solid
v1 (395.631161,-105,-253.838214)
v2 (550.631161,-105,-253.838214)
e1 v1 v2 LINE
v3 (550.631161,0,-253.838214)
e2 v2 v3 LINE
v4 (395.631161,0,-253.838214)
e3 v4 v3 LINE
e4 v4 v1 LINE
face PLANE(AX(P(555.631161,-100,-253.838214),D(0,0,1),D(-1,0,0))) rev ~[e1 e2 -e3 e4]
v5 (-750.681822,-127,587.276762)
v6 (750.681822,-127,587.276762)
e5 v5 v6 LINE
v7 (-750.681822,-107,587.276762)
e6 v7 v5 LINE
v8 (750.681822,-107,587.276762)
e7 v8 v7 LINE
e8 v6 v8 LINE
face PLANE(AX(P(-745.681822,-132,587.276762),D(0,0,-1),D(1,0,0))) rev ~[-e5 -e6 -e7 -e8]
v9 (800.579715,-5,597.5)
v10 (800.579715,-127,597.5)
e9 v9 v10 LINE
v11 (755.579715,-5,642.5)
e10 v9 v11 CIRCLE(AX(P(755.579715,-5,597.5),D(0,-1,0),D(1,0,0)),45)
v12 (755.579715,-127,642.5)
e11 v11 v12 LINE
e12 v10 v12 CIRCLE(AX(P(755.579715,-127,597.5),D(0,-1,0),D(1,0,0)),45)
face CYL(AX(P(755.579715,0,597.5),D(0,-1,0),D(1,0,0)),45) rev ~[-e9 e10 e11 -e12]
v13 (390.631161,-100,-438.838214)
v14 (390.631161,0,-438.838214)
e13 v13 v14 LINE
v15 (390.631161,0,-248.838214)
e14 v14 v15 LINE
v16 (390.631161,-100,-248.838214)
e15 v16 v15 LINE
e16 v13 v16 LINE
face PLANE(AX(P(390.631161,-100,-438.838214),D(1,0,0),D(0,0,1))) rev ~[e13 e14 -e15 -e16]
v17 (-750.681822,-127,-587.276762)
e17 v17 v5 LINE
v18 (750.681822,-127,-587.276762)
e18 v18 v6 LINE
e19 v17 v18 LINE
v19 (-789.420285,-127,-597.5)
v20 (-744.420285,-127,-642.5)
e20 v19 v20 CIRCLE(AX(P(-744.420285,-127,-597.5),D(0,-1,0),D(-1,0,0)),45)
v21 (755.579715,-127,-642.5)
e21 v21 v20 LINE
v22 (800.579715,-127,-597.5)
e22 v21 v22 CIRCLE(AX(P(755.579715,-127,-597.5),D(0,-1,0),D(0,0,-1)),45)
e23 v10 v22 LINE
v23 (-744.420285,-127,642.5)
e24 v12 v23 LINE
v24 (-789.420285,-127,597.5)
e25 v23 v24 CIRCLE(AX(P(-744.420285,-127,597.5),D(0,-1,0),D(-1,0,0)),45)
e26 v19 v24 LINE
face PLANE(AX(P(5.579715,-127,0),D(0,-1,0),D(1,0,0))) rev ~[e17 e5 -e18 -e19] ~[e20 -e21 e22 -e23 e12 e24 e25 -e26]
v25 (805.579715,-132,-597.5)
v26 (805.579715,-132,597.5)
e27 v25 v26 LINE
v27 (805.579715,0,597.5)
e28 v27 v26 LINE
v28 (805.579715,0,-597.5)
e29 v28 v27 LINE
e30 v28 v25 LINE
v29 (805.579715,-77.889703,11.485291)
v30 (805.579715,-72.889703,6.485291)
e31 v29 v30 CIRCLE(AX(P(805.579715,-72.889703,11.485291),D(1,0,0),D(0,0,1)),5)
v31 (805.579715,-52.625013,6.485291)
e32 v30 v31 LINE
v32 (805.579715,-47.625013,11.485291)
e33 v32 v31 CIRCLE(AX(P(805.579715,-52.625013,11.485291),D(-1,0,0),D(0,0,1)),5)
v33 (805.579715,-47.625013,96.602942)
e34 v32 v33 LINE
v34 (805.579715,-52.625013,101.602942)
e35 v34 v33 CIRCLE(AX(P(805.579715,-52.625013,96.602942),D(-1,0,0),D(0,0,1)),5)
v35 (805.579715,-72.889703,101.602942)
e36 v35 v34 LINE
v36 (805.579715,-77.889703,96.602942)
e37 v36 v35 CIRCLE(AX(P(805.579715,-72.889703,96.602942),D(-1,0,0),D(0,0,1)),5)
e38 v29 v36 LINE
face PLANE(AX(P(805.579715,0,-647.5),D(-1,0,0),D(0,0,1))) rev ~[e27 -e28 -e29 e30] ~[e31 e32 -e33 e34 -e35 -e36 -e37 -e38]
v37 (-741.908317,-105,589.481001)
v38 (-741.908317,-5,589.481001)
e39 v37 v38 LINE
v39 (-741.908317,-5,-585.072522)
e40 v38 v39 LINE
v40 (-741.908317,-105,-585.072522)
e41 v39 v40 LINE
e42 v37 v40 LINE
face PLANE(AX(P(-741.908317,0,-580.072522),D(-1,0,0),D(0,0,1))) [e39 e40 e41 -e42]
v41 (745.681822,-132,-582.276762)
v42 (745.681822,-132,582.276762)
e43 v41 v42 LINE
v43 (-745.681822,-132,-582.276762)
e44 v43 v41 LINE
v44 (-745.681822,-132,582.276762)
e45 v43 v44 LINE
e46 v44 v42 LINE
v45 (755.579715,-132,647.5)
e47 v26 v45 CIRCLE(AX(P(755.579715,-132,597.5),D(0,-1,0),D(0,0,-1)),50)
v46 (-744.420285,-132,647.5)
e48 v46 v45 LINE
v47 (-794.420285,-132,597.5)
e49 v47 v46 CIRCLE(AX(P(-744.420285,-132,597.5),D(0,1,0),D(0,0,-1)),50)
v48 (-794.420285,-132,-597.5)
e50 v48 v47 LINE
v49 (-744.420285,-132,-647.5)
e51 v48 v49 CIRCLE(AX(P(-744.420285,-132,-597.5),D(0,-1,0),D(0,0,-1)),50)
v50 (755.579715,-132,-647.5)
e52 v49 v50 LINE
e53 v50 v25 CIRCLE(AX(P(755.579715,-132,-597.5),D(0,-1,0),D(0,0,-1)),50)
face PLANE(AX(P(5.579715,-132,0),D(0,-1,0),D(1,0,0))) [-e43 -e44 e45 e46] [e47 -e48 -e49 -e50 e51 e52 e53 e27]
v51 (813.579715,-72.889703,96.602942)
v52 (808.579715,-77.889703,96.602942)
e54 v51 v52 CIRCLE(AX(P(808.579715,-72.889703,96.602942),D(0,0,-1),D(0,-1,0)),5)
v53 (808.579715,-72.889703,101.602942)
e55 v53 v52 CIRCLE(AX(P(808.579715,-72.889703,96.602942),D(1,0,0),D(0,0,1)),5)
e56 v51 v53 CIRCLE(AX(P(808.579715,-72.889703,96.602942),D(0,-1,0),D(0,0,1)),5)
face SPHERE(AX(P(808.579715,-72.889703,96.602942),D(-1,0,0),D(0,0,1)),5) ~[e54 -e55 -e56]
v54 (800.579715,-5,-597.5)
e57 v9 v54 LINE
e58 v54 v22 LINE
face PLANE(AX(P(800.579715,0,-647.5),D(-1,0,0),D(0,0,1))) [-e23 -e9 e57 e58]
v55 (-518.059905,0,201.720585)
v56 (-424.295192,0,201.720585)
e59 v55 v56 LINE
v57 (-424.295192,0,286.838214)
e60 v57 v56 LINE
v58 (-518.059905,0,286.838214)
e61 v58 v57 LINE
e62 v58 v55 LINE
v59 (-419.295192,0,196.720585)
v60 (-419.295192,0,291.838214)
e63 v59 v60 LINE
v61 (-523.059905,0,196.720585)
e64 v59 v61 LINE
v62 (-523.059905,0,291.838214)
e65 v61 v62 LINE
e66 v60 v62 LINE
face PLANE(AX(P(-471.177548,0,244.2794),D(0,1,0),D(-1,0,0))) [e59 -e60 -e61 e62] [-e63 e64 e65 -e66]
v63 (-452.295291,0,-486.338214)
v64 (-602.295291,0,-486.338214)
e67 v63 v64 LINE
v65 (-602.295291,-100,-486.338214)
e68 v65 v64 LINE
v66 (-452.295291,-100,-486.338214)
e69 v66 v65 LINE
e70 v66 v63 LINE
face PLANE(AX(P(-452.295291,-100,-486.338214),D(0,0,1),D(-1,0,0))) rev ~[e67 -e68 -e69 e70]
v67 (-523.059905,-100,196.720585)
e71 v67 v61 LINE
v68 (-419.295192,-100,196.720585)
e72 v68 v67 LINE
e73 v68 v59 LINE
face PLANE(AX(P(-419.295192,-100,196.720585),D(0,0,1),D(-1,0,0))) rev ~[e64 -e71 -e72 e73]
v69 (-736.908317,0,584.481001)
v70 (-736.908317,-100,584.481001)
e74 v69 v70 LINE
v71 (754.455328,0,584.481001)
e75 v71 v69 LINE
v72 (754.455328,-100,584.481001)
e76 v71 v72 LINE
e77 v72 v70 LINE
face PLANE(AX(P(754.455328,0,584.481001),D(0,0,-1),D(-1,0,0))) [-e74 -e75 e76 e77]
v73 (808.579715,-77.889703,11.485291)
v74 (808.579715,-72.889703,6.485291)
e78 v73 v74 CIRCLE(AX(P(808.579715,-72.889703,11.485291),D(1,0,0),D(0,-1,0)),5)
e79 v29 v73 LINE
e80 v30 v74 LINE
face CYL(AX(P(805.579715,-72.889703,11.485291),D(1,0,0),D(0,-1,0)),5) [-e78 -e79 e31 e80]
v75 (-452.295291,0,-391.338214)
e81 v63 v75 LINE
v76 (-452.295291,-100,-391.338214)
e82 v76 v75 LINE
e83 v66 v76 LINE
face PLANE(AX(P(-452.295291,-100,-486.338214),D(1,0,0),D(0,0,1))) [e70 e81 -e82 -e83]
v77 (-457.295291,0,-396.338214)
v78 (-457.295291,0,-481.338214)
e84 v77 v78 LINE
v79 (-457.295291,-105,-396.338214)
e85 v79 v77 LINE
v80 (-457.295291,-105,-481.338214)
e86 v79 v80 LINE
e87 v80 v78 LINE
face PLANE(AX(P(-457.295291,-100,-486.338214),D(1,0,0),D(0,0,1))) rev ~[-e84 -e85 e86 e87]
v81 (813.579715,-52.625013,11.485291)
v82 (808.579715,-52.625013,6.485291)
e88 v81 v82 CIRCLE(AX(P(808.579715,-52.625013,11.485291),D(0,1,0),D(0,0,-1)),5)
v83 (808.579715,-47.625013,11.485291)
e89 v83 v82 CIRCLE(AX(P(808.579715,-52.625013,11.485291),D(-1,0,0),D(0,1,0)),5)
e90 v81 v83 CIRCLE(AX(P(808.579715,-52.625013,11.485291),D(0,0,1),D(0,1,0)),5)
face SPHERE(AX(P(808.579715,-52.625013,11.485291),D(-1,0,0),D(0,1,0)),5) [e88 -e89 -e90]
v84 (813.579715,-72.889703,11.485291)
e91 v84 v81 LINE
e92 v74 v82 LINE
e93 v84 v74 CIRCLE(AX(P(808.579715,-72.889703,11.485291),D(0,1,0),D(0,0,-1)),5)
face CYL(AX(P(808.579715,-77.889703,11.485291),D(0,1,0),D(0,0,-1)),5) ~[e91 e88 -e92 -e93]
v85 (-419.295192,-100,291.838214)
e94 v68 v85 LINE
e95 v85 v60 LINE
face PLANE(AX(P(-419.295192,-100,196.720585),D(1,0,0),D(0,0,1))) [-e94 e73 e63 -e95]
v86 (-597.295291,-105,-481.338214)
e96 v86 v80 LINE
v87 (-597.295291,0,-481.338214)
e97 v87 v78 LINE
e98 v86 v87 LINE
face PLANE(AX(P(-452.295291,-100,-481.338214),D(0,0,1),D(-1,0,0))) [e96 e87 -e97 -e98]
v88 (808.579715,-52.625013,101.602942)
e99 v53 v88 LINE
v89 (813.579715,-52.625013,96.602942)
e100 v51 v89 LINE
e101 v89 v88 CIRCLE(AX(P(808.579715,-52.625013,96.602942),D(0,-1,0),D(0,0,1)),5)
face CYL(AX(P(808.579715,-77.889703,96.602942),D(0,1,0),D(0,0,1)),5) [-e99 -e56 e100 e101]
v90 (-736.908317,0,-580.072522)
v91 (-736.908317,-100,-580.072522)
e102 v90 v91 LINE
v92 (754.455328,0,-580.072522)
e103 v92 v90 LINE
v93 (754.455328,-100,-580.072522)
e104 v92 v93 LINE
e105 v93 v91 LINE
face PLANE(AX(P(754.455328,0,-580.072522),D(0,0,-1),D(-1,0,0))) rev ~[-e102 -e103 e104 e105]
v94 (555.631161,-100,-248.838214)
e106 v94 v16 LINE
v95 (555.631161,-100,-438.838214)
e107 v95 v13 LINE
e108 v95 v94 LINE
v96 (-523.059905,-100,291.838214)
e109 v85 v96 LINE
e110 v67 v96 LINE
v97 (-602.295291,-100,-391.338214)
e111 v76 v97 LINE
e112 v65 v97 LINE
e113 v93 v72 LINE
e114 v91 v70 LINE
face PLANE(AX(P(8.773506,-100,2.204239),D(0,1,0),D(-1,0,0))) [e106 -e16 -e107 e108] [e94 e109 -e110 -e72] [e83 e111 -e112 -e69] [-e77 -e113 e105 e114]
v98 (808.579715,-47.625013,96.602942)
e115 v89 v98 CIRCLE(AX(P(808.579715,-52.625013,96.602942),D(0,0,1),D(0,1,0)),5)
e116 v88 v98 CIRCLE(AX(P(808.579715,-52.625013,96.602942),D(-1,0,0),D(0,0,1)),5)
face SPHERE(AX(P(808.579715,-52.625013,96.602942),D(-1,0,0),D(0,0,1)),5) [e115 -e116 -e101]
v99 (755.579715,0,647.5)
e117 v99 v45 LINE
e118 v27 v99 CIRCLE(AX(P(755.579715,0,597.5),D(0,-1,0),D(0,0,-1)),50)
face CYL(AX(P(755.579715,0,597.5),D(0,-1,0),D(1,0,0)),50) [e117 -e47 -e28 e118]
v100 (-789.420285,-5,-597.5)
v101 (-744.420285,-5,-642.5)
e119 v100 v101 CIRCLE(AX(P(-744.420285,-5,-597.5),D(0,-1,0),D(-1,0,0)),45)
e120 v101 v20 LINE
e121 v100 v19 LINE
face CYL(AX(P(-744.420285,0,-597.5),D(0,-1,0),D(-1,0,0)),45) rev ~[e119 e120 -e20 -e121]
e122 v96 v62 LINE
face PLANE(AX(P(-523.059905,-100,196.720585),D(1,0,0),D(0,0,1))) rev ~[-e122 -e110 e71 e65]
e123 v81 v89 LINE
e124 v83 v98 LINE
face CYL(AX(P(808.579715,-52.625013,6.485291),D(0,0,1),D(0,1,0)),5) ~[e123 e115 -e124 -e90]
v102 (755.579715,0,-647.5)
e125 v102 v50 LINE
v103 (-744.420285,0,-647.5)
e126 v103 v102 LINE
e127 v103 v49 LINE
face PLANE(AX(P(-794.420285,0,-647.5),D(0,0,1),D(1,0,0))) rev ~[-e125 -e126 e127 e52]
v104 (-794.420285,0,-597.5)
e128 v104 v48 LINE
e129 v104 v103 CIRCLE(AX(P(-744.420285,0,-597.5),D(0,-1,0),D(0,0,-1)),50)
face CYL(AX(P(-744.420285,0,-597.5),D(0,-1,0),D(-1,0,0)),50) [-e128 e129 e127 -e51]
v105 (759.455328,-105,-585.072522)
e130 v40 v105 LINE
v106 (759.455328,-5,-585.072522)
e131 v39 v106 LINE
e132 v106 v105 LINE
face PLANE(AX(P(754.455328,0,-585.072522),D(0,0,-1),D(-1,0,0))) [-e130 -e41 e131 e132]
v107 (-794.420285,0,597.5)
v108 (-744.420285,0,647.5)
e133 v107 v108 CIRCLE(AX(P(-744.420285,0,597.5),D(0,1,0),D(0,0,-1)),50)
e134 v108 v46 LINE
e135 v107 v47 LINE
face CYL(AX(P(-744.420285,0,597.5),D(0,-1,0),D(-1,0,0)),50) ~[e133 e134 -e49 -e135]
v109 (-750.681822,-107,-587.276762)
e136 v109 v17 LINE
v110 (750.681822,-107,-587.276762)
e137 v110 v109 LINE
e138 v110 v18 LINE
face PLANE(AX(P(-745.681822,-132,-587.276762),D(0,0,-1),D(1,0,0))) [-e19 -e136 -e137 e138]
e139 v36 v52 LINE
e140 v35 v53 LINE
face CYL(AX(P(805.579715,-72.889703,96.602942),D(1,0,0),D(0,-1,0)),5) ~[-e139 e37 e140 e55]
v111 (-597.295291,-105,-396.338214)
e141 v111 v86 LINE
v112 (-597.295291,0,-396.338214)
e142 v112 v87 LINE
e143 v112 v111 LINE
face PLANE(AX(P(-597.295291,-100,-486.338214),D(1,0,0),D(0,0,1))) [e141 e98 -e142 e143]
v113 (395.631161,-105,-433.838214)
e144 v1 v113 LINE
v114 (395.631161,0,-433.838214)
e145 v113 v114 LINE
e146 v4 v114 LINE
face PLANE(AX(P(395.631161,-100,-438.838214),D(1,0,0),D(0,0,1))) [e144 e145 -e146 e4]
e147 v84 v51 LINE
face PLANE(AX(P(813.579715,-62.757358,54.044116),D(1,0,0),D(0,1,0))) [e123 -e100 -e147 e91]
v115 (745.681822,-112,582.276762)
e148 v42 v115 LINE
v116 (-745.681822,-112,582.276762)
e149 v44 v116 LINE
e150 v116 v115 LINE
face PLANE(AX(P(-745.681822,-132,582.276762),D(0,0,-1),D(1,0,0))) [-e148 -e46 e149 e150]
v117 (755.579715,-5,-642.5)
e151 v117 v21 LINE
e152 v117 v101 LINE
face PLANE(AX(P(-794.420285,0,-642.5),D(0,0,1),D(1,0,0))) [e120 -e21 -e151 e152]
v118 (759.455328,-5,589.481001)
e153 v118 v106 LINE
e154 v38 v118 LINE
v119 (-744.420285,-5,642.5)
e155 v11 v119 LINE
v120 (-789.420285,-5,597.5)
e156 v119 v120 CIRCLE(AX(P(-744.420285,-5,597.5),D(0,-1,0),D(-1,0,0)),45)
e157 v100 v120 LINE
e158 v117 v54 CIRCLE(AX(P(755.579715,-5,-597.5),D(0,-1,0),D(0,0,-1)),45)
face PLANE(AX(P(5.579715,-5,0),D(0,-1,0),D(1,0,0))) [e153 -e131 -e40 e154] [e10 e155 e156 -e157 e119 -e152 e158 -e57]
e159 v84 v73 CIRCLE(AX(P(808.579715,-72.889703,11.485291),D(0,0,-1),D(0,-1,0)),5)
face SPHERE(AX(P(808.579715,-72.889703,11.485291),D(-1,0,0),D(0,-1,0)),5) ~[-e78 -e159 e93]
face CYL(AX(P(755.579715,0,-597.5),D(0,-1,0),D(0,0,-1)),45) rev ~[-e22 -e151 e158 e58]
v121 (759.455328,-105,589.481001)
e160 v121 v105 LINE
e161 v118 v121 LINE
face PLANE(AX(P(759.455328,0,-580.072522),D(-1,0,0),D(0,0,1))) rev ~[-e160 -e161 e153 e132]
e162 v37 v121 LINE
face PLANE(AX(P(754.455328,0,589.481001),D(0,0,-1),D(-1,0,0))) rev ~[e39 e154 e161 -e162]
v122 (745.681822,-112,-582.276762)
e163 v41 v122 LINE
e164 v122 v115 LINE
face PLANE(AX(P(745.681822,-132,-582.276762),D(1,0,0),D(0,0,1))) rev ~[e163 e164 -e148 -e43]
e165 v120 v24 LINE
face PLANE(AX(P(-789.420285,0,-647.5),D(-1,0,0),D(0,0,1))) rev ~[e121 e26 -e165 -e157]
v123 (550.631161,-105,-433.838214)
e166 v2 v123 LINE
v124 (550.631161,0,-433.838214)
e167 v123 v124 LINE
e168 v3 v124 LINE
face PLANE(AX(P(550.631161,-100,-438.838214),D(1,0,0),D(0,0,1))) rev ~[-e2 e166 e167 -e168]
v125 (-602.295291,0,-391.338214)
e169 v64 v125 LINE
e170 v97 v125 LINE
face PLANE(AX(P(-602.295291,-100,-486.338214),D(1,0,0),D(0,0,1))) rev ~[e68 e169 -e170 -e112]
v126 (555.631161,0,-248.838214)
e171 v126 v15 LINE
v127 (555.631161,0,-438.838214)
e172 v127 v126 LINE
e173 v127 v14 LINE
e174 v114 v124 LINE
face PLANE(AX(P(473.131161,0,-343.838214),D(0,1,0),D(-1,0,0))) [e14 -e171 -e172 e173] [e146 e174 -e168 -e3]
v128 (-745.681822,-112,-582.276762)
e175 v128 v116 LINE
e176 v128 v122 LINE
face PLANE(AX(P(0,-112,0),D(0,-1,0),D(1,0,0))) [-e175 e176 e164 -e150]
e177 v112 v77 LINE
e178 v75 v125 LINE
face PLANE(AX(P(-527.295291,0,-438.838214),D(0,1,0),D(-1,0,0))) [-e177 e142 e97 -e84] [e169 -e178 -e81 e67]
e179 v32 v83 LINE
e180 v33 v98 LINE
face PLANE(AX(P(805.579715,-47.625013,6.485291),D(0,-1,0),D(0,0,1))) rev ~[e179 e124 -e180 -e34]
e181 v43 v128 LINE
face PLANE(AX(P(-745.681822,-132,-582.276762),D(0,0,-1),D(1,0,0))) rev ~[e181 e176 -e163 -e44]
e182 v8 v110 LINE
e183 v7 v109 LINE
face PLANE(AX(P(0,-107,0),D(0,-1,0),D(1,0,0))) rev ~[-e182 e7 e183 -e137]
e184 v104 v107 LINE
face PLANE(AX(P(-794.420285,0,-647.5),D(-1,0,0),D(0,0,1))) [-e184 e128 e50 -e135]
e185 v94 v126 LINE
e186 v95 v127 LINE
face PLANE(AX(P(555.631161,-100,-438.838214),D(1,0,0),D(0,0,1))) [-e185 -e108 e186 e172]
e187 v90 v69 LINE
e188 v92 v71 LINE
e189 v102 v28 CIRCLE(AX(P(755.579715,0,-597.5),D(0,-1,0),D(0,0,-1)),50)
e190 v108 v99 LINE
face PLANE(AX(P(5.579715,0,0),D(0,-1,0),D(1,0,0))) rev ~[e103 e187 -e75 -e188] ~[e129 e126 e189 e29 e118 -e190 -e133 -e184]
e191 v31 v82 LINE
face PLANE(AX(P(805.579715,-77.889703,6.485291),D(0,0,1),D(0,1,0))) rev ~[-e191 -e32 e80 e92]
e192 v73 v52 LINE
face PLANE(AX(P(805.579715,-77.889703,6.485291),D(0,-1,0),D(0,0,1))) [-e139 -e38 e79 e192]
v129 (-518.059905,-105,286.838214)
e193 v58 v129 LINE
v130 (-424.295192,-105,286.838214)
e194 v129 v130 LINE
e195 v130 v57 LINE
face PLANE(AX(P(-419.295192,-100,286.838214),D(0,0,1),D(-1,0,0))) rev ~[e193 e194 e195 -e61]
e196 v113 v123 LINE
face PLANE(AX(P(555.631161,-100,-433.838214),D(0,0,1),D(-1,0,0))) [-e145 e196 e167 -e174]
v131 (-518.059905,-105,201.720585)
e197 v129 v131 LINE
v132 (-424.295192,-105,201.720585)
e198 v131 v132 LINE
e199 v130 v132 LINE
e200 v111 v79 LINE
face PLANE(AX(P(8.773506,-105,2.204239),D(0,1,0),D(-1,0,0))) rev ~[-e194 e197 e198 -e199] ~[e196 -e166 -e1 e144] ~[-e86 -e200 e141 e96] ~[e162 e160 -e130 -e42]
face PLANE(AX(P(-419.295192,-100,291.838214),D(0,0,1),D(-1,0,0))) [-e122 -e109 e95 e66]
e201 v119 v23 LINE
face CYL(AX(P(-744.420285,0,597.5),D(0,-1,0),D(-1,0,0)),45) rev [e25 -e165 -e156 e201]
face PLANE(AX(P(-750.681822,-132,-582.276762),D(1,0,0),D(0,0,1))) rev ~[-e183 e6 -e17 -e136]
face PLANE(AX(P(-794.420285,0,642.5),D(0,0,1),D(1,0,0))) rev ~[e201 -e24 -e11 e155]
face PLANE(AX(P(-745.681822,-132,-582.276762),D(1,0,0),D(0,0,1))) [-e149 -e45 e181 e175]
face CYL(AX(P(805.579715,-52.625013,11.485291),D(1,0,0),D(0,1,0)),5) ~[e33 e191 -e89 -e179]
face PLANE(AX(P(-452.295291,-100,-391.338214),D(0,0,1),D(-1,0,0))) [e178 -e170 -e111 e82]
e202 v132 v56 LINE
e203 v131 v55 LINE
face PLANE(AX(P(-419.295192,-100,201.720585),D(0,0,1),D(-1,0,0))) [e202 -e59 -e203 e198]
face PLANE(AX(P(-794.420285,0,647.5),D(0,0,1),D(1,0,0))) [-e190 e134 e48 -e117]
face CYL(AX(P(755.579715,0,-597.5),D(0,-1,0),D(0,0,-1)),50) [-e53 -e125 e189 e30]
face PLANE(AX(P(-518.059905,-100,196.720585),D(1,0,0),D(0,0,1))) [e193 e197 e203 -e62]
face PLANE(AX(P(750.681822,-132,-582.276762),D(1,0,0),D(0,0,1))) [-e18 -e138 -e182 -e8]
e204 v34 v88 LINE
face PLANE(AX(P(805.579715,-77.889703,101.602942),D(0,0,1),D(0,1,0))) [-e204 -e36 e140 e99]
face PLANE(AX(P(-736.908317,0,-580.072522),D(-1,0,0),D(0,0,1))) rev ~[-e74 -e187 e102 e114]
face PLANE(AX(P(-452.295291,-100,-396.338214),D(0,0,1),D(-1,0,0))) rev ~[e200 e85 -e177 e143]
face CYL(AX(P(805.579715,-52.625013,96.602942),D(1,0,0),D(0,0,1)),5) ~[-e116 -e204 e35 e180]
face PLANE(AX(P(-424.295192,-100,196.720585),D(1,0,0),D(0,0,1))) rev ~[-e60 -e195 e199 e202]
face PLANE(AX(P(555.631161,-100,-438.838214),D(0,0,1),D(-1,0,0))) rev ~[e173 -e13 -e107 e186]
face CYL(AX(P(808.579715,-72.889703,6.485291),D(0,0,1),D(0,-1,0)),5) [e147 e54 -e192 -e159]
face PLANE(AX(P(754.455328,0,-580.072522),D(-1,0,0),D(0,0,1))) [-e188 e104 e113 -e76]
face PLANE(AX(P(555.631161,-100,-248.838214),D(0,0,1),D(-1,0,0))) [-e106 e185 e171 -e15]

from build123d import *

# Parameters (mm, degrees)
F0_W      = 1600
F0_H      = 1295
F1_DEPTH  = 132
F2_R      = 50
F4_W      = 1491.3636445999
F4_H      = 1164.5535230637
F5_DEPTH  = 20
F7_W      = 1491.3636445999
F7_H      = 1164.5535230637
F8_DEPTH  = 100
F10_W     = 150
F10_H     = 95
F10_W_2   = 103.7647128105
F10_H_2   = 95.1176285744
F10_W_3   = 165
F10_H_3   = 190
F11_DEPTH = 100
F12_T     = -5
F13_W     = 30.2646905184
F13_H     = 95.1176509261
F14_DEPTH = 8
F15_R     = 5


# Not quite as in the source:
# - the program builds the solid bodies; features that only make, move or delete a surface that nothing else refers to are left out


with BuildPart() as f1:
    # F0 (on Front) → F1 (new body)
    with BuildSketch(Plane.XZ):
        with Locations((5.5797146633, 0)):
            Rectangle(F0_W, F0_H)
    extrude(amount=F1_DEPTH)

    # F2
    f2_edges = [f1.edges().sort_by_distance(p)[0] for p in [
        (-794.420285, -66, 647.5),
        (805.579715, -66, 647.5),
        (805.579715, -66, -647.5),
        (-794.420285, -66, -647.5),
    ]]
    fillet(f2_edges, radius=F2_R)

    # F4 (on offset) → F5 (cut)
    with BuildSketch(Plane.XZ.offset(132)):
        Rectangle(F4_W, F4_H)
    extrude(amount=-F5_DEPTH, mode=Mode.SUBTRACT)

    # F7 (on offset) → F8 (cut)
    with BuildSketch(Plane(origin=(0, 0, 0), x_dir=(-1, 0, 0), z_dir=(0, 1, 0))):
        with Locations((-8.7735056877, 2.2042393684)):
            Rectangle(F7_W, F7_H)
    extrude(amount=-F8_DEPTH, mode=Mode.SUBTRACT)

    # F10 (on offset) → F11 (join)
    with BuildSketch(Plane(origin=(0, -100, 0), x_dir=(-1, 0, 0), z_dir=(0, 1, 0))):
        with Locations((527.2952914238, -438.8382136822)):
            Rectangle(F10_W, F10_H)
        with Locations((471.1775481701, 244.2793995142)):
            Rectangle(F10_W_2, F10_H_2)
        with Locations((-473.1311607361, -343.8382136822)):
            Rectangle(F10_W_3, F10_H_3)
    extrude(amount=F11_DEPTH)

    # F12
    f12_openings = [f1.faces().sort_by_distance(p)[0] for p in [
        (-527.295291, 0, -438.838214),
        (-471.177548, 0, 244.2794),
        (473.131161, 0, -343.838214),
    ]]
    offset(amount=F12_T, openings=f12_openings, kind=Kind.INTERSECTION)

    # F13 (on face) → F14 (join)
    with BuildSketch(Plane.YZ.offset(805.5797146633)):
        with Locations((-62.757357955, 54.0441162884)):
            Rectangle(F13_W, F13_H)
    extrude(amount=F14_DEPTH)

    # F15
    f15_edges = [f1.edges().sort_by_distance(p)[0] for p in [
        (809.579715, -47.625013, 101.602942),
        (809.579715, -77.889703, 101.602942),
        (809.579715, -77.889703, 6.485291),
        (809.579715, -47.625013, 6.485291),
        (813.579715, -62.757358, 101.602942),
        (813.579715, -77.889703, 54.044116),
        (813.579715, -47.625013, 54.044116),
        (813.579715, -62.757358, 6.485291),
    ]]
    fillet(f15_edges, radius=F15_R)


solid = f1.part
